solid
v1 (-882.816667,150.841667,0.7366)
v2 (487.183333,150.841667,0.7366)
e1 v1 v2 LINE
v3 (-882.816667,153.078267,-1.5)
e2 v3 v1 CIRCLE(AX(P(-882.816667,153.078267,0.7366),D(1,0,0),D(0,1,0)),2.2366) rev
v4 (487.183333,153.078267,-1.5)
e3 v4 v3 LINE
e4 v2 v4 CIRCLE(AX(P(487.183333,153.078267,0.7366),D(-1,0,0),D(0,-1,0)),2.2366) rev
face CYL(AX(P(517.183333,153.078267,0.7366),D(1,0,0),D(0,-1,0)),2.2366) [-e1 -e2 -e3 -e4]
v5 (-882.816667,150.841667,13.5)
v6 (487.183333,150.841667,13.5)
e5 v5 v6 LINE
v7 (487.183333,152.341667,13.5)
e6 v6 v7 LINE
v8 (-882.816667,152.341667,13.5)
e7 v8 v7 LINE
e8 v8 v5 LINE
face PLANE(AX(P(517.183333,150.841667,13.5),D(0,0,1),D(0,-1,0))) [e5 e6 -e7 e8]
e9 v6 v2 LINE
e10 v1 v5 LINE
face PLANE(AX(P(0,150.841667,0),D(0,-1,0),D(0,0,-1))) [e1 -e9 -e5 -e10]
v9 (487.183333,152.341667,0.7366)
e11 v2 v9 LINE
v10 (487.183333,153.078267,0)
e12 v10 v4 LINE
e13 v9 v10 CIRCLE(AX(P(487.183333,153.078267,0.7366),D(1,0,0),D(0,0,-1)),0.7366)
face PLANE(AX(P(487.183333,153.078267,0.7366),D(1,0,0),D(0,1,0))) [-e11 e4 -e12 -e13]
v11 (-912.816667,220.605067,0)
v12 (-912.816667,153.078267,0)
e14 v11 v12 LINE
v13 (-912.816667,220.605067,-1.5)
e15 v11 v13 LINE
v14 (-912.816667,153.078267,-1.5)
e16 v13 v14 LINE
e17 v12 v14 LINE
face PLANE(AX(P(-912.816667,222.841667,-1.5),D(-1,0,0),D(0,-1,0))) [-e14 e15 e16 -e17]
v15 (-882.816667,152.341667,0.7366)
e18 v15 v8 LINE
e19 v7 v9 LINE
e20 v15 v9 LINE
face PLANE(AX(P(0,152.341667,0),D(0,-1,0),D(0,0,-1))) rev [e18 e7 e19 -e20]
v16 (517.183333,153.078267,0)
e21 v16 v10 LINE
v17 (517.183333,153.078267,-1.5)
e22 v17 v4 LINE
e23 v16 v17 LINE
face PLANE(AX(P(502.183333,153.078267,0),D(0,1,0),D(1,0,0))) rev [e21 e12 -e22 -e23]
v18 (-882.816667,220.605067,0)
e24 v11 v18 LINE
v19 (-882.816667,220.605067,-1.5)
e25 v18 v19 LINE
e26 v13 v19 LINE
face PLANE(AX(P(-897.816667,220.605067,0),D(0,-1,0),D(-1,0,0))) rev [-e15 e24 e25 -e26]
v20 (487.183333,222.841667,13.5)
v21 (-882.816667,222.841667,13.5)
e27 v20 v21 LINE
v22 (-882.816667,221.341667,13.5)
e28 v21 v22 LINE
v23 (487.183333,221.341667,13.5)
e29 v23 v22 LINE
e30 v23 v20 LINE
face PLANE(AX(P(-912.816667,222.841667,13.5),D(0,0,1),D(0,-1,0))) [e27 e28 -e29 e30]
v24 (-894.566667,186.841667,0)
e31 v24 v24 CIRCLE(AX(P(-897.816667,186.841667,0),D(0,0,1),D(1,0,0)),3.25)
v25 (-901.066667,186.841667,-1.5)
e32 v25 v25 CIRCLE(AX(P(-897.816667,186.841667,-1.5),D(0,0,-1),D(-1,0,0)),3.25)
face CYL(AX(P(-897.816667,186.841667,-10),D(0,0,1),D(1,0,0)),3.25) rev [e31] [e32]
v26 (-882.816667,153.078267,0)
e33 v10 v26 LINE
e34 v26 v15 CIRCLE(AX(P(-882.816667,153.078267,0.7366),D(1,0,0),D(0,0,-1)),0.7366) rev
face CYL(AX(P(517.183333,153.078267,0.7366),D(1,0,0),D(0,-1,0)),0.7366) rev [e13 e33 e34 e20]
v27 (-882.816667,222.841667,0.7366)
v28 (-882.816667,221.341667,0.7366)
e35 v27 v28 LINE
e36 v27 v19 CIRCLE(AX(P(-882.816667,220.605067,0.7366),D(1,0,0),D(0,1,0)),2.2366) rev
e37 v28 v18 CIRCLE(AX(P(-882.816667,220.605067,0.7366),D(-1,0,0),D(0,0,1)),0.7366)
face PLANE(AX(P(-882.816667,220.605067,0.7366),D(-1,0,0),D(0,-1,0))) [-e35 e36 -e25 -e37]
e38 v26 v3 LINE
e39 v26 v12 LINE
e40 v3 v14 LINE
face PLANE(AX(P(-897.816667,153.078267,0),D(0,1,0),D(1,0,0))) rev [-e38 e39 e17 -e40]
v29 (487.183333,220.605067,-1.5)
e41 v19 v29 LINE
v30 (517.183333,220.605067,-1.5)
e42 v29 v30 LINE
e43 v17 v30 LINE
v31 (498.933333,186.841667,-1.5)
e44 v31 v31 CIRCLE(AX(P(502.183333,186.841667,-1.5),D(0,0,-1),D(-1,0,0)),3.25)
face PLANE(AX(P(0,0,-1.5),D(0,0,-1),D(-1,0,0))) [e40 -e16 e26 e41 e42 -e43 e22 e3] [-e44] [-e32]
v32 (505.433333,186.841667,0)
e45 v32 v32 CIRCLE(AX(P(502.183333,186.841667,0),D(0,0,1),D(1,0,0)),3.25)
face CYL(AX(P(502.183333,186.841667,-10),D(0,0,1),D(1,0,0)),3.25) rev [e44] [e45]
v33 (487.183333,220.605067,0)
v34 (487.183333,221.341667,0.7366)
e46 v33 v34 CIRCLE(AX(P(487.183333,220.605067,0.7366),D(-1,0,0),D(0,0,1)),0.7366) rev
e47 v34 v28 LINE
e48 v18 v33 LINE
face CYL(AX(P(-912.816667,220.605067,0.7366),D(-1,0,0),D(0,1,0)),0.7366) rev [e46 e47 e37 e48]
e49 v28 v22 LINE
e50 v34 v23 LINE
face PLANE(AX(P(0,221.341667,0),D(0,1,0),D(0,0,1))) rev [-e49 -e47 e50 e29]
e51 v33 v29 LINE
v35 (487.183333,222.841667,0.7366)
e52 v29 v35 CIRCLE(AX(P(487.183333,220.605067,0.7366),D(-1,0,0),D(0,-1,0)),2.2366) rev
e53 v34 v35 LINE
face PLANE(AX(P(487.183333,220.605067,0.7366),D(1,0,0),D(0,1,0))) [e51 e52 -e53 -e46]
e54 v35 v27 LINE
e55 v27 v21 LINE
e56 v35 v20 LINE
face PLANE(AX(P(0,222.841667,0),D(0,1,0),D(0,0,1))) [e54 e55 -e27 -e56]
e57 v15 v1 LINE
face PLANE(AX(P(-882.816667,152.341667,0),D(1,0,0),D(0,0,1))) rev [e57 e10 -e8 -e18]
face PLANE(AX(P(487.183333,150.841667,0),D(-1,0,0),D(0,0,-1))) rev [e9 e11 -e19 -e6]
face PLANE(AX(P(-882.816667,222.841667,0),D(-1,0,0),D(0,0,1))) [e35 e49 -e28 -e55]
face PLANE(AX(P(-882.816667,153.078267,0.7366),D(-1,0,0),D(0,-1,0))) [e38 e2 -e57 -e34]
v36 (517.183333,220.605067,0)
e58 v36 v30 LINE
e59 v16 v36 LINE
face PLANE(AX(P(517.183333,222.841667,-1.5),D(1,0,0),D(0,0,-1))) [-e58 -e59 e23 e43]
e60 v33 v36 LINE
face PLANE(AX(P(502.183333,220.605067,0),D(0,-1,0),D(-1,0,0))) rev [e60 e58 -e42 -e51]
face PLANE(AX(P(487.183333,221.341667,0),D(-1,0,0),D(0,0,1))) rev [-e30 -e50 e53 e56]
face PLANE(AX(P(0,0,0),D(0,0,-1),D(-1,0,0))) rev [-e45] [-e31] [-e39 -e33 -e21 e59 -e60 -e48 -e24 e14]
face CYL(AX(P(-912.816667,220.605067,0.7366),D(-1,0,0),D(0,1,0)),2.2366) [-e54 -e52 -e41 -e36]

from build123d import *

# Parameters (mm, degrees)
SKETCH1_W                    = 1430
SKETCH1_H                    = 72
BASE_FLANGE1_DEPTH           = 1.5
EDGE_FLANGE1_STRIP_W         = 7.4732
EDGE_FLANGE1_STRIP_H         = 1.5
EDGE_FLANGE1_STRIP_CUT_DEPTH = 1430
EDGE_FLANGE1_DEPTH           = 1430
EDGE_FLANGE2_STRIP_W         = 7.4732
EDGE_FLANGE2_STRIP_H         = 1.5
EDGE_FLANGE2_STRIP_CUT_DEPTH = 1430
EDGE_FLANGE2_DEPTH           = 1430
CUT_EXTRUDE1_START           = -912.816666667
CUT_EXTRUDE1_DEPTH           = 30
CUT_EXTRUDE2_START           = 487.183333333
CUT_EXTRUDE2_DEPTH           = 30
SKETCH14_R                   = 3.25
CUT_EXTRUDE3_DEPTH           = 10


# Read off the part's stored shape, not the designer's step: Cut-Extrude1, Cut-Extrude2
# Sheet-metal steps are written as plain solids
with BuildPart() as part:
    # Sketch1 → Base-Flange1 (new body)
    with BuildSketch(Plane.XY):
        with Locations((-197.816666667, 186.841666667)):
            Rectangle(SKETCH1_W, SKETCH1_H)
    extrude(amount=-BASE_FLANGE1_DEPTH)

    # Edge-Flange1 strip (across the edge) → Edge-Flange1 strip cut (cut)
    with BuildSketch(Plane(origin=(517.183333333, 222.841666667, 0), x_dir=(0, -1, 0), z_dir=(-1, 0, 0))):
        with Locations((-1.5, -0.75)):
            Rectangle(EDGE_FLANGE1_STRIP_W, EDGE_FLANGE1_STRIP_H)
    extrude(amount=EDGE_FLANGE1_STRIP_CUT_DEPTH, mode=Mode.SUBTRACT)

    # Edge-Flange1 section (across the edge) → Edge-Flange1 (add)
    with BuildSketch(Plane(origin=(517.183333333, 222.841666667, 0), x_dir=(0, -1, 0), z_dir=(-1, 0, 0))):
        with BuildLine():
            Line((0, 0.7366), (0, 13.5))
            Line((0, 13.5), (1.5, 13.5))
            Line((1.5, 13.5), (1.5, 0.7366))
            ThreePointArc((1.5, 0.7366), (1.715745145, 0.215745145), (2.2366, 0))
            Line((2.2366, 0), (2.2366, -1.5))
            ThreePointArc((2.2366, -1.5), (0.655084973, -0.844915027), (0, 0.7366))
        make_face()
    extrude(amount=EDGE_FLANGE1_DEPTH)

    # Edge-Flange2 strip (across the edge) → Edge-Flange2 strip cut (cut)
    with BuildSketch(Plane(origin=(-912.816666667, 150.841666667, 0), x_dir=(0, 1, 0), z_dir=(1, 0, 0))):
        with Locations((-1.5, -0.75)):
            Rectangle(EDGE_FLANGE2_STRIP_W, EDGE_FLANGE2_STRIP_H)
    extrude(amount=EDGE_FLANGE2_STRIP_CUT_DEPTH, mode=Mode.SUBTRACT)

    # Edge-Flange2 section (across the edge) → Edge-Flange2 (add)
    with BuildSketch(Plane(origin=(-912.816666667, 150.841666667, 0), x_dir=(0, 1, 0), z_dir=(1, 0, 0))):
        with BuildLine():
            Line((0, 0.7366), (0, 13.5))
            Line((0, 13.5), (1.5, 13.5))
            Line((1.5, 13.5), (1.5, 0.7366))
            ThreePointArc((1.5, 0.7366), (1.715745145, 0.215745145), (2.2366, 0))
            Line((2.2366, 0), (2.2366, -1.5))
            ThreePointArc((2.2366, -1.5), (0.655084973, -0.844915027), (0, 0.7366))
        make_face()
    extrude(amount=EDGE_FLANGE2_DEPTH)

    # Cut-Extrude1 outline → Cut-Extrude1 (cut)
    with BuildSketch(Plane.YZ.offset(CUT_EXTRUDE1_START)):
        with BuildLine():
            ThreePointArc((150.841666667, 0.7366), (151.49675164, -0.844915027), (153.078266667, -1.5))
            Line((153.078266667, -1.5), (153.078266667, 0))
            ThreePointArc((153.078266667, 0), (152.557411812, 0.215745145), (152.341666667, 0.7366))
            Line((152.341666667, 0.7366), (152.341666667, 13.5))
            Line((152.341666667, 13.5), (150.841666667, 13.5))
            Line((150.841666667, 13.5), (150.841666667, 0.7366))
        make_face()
        with BuildLine():
            ThreePointArc((221.341666667, 0.7366), (221.125921522, 0.215745145), (220.605066667, 0))
            Line((220.605066667, 0), (220.605066667, -1.5))
            ThreePointArc((220.605066667, -1.5), (222.186581693, -0.844915026), (222.841666667, 0.7366))
            Line((222.841666667, 0.7366), (222.841666667, 13.5))
            Line((222.841666667, 13.5), (221.341666667, 13.5))
            Line((221.341666667, 13.5), (221.341666667, 0.7366))
        make_face()
    extrude(amount=CUT_EXTRUDE1_DEPTH, mode=Mode.SUBTRACT)

    # Cut-Extrude2 outline → Cut-Extrude2 (cut)
    with BuildSketch(Plane.YZ.offset(CUT_EXTRUDE2_START)):
        with BuildLine():
            ThreePointArc((150.841666667, 0.7366), (151.49675164, -0.844915027), (153.078266667, -1.5))
            Line((153.078266667, -1.5), (153.078266667, 0))
            ThreePointArc((153.078266667, 0), (152.557411812, 0.215745145), (152.341666667, 0.7366))
            Line((152.341666667, 0.7366), (152.341666667, 13.5))
            Line((152.341666667, 13.5), (150.841666667, 13.5))
            Line((150.841666667, 13.5), (150.841666667, 0.7366))
        make_face()
        with BuildLine():
            ThreePointArc((221.341666667, 0.7366), (221.125921522, 0.215745145), (220.605066667, 0))
            Line((220.605066667, 0), (220.605066667, -1.5))
            ThreePointArc((220.605066667, -1.5), (222.186581693, -0.844915026), (222.841666667, 0.7366))
            Line((222.841666667, 0.7366), (222.841666667, 13.5))
            Line((222.841666667, 13.5), (221.341666667, 13.5))
            Line((221.341666667, 13.5), (221.341666667, 0.7366))
        make_face()
    extrude(amount=CUT_EXTRUDE2_DEPTH, mode=Mode.SUBTRACT)

    # Sketch14 → Cut-Extrude3 (cut)
    with BuildSketch(Plane.XY):
        with Locations((502.183333333, 186.841666667)):
            Circle(SKETCH14_R)
        with Locations((-897.816666667, 186.841666667)):
            Circle(SKETCH14_R)
    extrude(amount=-CUT_EXTRUDE3_DEPTH, mode=Mode.SUBTRACT)


solid = part.part
